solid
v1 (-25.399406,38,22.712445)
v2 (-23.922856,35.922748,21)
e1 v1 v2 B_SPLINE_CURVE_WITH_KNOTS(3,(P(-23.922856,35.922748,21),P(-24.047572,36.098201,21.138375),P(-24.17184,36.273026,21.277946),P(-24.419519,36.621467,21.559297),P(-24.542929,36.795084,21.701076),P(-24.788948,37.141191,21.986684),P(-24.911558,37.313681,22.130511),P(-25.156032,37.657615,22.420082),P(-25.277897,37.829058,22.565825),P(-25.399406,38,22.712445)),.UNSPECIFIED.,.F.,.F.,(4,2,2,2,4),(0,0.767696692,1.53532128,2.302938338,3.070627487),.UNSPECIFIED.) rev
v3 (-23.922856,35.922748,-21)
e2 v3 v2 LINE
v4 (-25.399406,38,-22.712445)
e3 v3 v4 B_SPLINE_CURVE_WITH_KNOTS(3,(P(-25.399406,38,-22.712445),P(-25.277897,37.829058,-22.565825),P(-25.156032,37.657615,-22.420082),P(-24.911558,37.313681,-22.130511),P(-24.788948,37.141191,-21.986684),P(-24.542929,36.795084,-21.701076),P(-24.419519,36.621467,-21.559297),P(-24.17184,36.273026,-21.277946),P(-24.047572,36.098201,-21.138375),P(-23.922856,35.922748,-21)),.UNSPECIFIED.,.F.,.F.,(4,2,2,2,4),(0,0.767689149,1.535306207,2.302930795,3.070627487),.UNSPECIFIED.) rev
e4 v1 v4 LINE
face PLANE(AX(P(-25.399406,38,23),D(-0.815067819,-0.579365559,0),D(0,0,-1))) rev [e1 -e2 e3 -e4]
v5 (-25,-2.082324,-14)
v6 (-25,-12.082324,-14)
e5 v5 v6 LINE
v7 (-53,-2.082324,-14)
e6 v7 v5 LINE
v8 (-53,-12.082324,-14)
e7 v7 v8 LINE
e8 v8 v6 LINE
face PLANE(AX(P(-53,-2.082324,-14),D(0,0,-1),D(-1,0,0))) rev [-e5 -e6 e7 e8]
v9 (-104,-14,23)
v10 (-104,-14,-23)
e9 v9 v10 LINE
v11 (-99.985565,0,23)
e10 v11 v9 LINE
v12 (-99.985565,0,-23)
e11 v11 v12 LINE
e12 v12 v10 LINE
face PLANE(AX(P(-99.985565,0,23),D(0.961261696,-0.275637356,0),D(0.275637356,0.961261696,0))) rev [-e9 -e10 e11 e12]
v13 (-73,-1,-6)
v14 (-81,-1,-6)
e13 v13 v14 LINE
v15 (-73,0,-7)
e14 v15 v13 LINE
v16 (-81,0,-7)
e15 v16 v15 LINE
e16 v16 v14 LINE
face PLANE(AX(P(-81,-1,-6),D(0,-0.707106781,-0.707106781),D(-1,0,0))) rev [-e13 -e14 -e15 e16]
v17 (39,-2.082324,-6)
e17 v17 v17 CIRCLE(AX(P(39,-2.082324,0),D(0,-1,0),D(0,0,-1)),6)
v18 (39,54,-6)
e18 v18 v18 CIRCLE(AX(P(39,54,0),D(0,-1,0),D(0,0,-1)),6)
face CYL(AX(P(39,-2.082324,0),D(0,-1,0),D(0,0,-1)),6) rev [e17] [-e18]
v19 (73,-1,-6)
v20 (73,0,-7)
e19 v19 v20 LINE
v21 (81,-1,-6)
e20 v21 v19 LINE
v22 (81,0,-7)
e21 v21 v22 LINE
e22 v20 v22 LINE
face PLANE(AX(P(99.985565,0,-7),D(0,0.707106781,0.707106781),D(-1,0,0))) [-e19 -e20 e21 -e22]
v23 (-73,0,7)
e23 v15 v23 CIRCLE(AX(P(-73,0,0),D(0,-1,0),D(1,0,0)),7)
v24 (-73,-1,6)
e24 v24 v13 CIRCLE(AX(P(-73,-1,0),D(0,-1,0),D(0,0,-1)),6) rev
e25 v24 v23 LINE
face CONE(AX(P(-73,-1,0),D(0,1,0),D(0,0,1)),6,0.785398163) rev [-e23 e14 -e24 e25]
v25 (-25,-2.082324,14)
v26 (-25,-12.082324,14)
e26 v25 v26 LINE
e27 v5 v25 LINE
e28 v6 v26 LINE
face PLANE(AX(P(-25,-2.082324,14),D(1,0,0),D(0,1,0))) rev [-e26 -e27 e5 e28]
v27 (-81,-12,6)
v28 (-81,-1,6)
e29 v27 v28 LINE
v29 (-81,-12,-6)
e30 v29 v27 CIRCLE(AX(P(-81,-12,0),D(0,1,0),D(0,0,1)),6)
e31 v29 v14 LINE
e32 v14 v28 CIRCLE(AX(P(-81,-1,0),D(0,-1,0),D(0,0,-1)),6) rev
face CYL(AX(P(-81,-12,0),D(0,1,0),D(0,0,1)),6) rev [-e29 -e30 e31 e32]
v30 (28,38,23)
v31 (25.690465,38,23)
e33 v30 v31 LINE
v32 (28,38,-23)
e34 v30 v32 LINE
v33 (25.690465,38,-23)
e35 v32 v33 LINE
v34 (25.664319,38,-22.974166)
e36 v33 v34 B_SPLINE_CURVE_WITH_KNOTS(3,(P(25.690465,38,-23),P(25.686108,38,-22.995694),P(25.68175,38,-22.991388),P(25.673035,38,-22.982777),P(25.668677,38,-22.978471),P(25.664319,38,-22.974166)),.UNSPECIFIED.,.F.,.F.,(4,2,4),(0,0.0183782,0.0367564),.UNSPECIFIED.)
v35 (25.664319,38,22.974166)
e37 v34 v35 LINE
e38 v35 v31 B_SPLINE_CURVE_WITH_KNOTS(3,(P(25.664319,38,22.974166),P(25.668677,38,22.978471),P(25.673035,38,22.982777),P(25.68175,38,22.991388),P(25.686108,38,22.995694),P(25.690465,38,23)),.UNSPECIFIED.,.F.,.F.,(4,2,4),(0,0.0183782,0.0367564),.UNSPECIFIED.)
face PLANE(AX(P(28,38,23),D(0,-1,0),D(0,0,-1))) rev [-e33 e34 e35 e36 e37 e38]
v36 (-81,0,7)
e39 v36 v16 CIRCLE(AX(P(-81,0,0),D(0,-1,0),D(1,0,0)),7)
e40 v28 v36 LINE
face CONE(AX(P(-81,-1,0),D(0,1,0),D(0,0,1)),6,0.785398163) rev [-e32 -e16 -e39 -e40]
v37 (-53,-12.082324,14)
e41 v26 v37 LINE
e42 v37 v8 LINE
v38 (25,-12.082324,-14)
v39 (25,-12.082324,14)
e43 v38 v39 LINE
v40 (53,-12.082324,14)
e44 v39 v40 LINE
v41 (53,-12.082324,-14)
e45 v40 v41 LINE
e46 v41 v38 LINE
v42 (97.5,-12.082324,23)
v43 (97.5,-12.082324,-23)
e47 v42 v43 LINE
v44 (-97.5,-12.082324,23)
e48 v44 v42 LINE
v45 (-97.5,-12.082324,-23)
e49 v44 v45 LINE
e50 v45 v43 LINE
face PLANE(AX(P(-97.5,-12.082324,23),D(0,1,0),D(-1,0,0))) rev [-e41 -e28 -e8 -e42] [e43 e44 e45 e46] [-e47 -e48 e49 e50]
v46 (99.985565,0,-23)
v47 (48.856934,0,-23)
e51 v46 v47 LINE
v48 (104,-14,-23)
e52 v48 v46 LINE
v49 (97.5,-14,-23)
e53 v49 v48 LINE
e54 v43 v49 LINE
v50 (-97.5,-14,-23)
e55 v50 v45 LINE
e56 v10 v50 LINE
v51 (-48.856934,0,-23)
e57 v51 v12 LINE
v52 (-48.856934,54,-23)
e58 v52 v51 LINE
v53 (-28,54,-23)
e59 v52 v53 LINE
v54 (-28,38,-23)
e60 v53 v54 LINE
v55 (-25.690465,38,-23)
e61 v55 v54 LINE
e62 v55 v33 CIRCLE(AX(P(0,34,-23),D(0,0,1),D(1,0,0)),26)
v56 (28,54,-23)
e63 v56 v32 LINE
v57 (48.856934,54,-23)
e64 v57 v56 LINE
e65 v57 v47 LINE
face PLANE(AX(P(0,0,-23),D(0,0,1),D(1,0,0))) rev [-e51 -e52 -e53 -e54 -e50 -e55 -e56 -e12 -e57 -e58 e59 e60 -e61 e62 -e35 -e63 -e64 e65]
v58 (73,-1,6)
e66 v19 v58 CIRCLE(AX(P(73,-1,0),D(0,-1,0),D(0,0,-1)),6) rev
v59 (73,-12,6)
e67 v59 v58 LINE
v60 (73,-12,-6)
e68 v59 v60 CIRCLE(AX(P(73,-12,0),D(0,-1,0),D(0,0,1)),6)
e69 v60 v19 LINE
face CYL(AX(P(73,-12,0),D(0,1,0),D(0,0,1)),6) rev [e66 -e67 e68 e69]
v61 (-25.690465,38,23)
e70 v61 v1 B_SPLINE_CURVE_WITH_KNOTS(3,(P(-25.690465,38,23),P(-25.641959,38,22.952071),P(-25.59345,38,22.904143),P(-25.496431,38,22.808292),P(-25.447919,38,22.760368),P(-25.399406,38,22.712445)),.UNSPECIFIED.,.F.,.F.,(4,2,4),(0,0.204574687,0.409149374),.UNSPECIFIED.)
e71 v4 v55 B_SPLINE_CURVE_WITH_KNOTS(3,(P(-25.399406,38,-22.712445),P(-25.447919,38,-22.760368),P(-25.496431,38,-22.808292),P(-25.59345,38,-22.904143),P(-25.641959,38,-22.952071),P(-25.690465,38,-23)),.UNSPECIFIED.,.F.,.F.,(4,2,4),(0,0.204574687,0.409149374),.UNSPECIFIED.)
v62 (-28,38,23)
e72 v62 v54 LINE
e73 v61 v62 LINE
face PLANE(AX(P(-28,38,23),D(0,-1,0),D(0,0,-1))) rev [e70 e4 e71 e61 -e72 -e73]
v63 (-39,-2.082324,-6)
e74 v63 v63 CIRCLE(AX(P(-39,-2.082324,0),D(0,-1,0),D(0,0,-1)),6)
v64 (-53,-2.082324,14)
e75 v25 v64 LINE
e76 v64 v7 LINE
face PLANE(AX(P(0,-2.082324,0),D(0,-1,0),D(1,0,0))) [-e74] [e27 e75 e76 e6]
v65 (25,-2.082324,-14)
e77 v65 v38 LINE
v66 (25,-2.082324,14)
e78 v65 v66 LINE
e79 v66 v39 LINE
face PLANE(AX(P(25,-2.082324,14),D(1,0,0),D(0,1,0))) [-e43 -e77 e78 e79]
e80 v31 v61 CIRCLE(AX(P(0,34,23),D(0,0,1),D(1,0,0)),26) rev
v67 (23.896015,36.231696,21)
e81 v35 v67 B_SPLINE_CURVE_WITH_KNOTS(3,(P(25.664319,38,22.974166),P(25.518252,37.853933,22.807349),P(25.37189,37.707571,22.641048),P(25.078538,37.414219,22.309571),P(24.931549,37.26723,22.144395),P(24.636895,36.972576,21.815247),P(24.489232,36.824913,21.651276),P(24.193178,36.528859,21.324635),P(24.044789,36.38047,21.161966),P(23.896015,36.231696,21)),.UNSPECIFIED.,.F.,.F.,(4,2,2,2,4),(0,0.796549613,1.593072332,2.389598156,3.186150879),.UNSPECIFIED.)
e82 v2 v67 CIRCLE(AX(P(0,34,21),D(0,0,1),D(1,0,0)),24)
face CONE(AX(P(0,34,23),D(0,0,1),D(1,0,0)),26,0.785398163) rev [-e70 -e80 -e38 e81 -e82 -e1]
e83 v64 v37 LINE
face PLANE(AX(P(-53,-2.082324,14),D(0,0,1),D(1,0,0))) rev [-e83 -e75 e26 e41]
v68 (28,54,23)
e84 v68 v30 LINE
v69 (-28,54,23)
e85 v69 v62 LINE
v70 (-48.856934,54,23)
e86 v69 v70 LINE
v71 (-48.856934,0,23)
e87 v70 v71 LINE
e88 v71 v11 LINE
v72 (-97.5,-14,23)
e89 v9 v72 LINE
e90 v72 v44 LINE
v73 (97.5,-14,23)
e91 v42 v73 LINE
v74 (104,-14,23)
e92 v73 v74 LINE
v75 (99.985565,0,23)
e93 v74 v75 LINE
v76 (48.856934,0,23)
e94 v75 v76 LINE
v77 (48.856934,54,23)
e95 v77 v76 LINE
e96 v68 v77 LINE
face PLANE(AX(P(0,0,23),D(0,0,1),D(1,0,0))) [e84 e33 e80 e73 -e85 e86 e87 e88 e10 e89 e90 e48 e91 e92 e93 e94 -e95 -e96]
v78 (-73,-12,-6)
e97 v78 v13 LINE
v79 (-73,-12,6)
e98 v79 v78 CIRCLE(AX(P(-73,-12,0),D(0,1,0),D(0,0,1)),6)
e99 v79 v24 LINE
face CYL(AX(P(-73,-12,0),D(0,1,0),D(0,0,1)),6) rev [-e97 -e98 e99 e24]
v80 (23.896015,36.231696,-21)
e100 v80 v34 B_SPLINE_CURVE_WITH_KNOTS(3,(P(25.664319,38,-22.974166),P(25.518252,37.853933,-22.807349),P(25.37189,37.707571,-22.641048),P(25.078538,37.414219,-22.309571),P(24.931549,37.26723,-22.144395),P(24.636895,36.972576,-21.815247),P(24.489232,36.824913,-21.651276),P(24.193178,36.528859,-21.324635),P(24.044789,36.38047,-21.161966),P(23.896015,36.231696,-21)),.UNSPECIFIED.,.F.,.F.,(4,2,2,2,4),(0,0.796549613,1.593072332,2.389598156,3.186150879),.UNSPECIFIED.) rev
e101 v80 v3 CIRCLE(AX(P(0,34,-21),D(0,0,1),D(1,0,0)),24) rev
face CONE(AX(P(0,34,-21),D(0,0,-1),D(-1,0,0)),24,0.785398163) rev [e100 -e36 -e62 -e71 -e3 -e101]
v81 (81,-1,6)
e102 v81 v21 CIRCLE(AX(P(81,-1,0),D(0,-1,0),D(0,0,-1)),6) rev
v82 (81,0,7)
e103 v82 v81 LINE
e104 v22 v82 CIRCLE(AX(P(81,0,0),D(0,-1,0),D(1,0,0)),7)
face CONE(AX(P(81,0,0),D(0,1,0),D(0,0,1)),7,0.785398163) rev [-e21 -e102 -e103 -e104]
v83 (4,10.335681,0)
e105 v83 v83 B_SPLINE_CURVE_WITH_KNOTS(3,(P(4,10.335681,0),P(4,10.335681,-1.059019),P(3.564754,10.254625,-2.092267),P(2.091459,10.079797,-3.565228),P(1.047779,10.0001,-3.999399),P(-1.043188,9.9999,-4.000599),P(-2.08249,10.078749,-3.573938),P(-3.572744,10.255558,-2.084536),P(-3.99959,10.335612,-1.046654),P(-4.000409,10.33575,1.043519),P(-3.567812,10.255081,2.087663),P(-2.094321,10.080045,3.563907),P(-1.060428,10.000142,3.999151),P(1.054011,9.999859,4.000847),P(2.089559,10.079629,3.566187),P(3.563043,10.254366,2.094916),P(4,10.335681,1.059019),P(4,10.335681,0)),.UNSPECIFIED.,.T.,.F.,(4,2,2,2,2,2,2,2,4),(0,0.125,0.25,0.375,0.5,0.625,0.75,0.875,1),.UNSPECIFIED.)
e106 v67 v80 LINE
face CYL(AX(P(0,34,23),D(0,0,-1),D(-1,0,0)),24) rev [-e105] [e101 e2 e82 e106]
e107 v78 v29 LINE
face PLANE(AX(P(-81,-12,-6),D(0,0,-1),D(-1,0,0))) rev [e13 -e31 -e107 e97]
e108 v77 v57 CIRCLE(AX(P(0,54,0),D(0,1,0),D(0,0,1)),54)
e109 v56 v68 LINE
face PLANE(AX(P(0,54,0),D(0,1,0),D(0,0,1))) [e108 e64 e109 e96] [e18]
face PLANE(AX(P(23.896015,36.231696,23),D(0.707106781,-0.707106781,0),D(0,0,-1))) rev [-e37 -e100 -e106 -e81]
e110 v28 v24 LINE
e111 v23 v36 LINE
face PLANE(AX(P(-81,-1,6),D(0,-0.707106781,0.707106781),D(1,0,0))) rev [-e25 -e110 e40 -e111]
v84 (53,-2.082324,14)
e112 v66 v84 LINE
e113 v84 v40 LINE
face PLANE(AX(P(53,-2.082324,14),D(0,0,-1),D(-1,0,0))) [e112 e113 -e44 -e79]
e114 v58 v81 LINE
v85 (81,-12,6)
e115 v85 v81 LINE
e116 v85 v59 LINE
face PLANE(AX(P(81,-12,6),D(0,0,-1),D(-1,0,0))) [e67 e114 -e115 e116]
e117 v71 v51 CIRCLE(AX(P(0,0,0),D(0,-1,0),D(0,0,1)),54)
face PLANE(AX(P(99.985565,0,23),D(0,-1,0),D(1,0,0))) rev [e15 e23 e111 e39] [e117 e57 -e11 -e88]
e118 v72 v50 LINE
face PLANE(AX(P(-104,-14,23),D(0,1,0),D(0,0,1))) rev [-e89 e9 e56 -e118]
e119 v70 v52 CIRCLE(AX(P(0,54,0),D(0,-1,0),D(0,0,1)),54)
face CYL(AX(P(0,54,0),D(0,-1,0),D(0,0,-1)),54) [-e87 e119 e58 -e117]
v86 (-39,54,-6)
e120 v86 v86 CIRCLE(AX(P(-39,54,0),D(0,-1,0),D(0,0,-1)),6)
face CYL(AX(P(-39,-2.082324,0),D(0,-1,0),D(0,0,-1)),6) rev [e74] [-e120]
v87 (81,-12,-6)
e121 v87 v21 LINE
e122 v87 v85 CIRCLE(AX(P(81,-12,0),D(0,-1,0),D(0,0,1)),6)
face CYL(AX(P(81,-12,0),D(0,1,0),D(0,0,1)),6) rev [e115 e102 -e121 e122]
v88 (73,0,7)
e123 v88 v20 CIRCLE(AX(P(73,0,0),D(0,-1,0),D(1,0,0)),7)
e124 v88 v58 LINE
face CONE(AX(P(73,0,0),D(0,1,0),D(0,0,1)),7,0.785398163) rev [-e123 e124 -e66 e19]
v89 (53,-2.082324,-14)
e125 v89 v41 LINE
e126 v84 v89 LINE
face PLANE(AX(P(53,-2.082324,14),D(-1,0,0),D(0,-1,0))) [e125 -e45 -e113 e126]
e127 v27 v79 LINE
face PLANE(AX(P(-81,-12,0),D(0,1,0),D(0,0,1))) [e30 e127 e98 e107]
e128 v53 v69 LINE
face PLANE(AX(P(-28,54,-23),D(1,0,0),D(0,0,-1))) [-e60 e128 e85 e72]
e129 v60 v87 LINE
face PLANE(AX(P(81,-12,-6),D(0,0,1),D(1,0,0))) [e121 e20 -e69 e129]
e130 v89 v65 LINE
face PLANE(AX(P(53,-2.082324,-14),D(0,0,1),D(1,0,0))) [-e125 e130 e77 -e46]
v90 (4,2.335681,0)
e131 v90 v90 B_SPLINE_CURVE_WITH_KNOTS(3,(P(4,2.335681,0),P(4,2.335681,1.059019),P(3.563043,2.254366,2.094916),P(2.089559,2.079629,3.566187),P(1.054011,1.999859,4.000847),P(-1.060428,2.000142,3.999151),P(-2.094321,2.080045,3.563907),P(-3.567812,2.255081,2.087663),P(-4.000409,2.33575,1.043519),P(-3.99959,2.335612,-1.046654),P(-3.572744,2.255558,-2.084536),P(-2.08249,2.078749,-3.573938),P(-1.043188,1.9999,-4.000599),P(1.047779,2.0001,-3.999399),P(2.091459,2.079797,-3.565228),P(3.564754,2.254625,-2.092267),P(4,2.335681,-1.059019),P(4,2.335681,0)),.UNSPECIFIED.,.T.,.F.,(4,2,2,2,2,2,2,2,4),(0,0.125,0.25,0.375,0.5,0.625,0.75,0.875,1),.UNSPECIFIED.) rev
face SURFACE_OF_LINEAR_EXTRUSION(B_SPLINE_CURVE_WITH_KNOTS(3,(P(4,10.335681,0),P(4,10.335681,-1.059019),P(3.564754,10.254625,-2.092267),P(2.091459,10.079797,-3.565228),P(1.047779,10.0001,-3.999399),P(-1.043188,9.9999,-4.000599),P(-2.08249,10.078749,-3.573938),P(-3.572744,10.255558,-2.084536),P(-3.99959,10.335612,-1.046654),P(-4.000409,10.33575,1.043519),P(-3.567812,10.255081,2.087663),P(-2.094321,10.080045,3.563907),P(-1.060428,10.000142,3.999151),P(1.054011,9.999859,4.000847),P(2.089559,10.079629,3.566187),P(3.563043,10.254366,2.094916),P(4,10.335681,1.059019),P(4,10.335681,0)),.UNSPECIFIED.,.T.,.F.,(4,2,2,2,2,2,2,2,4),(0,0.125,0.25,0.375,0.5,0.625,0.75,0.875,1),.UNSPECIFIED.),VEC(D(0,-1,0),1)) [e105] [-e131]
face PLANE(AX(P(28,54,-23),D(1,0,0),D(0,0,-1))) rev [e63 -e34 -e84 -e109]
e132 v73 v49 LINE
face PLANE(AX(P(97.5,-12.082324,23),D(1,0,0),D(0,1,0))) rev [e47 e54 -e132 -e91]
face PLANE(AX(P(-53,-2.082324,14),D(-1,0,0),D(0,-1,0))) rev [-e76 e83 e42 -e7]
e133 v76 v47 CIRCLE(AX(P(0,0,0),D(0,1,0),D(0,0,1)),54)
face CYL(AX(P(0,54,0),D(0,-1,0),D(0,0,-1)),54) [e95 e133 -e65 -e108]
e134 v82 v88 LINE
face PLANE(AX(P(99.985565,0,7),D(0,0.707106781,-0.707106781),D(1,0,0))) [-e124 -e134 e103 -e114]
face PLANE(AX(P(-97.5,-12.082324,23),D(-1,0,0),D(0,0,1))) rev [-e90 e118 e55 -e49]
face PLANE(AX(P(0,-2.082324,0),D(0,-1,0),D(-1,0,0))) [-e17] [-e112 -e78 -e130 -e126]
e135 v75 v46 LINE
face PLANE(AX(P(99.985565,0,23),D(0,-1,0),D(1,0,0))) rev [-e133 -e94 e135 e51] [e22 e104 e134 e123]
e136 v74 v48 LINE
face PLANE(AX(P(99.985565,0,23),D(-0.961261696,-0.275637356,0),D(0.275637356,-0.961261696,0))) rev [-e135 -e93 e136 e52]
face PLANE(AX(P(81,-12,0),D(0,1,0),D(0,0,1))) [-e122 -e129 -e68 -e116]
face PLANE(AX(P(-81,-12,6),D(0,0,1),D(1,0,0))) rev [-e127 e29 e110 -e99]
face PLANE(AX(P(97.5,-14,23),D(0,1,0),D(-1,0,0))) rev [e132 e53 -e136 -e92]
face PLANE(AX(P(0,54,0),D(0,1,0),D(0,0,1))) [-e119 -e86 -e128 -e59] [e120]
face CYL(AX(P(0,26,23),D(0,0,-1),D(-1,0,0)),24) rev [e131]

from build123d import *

# Parameters (mm, degrees)
BOSS_EXTRUDE1_DEPTH      = 23
BOSS_EXTRUDE2_DEPTH      = 54
BOSS_EXTRUDE3_DEPTH      = 23
CUT_EXTRUDE1_DEPTH       = 12
CHAMFER1_SIZE            = 1
CHAMFER1_OF_MIRROR2_SIZE = 1
SKETCH7_W                = 28
SKETCH7_H                = 28
CUT_EXTRUDE2_DEPTH       = 10
F_12_0MM_DOWEL_HOLE1_D   = 12
CUT_EXTRUDE3_START       = 1.999999915
CUT_EXTRUDE3_DEPTH       = 36.000000085
CUT_EXTRUDE3_START_2     = -5
CUT_EXTRUDE3_2_DEPTH     = 10
CHAMFER2_START           = -23
CHAMFER2_2_DEPTH         = 46


with BuildPart() as part:
    # Sketch2 → Boss-Extrude1 (new, symmetric)
    with BuildSketch(Plane.XY):
        Polygon((99.985564599, 0), (-99.985564599, 0), (-104, -14), (-97.5, -14), (-97.5, -12.082323829), (97.5, -12.082323829), (97.5, -14), (104, -14), align=None)
    extrude(amount=BOSS_EXTRUDE1_DEPTH, both=True)

    # Sketch3 → Boss-Extrude2 (add)
    with BuildSketch(Plane(origin=(0, 0, 0), x_dir=(1, 0, 0), z_dir=(0, 1, 0))):
        with BuildLine():
            Line((48.856934001, -23), (28, -23))
            Line((28, -23), (28, 23))
            Line((28, 23), (48.856934001, 23))
            ThreePointArc((48.856934001, 23), (54, 0), (48.856934001, -23))
        make_face()
    boss_extrude2 = extrude(amount=BOSS_EXTRUDE2_DEPTH)

    # Mirror1: Boss-Extrude2 across plane
    add(boss_extrude2.mirror(Plane(origin=(0, 0, 0), x_dir=(0, 0, 1), z_dir=(1, 0, 0))))

    # Sketch4 → Boss-Extrude3 (add, symmetric)
    with BuildSketch(Plane.XY):
        with BuildLine():
            Line((-28, 38), (-23.664319132, 38))
            ThreePointArc((-23.664319132, 38), (0, 10), (23.664319132, 38))
            Line((23.664319132, 38), (28, 38))
            Line((28, 38), (28, 0))
            Line((28, 0), (-28, 0))
            Line((-28, 0), (-28, 38))
        make_face()
    extrude(amount=BOSS_EXTRUDE3_DEPTH, both=True)

    # Sketch5 → Cut-Extrude1 (cut)
    with BuildSketch(Plane(origin=(0, 0, 0), x_dir=(1, 0, 0), z_dir=(0, 1, 0))):
        with BuildLine():
            Line((-81, 6), (-73, 6))
            ThreePointArc((-73, 6), (-67, 0), (-73, -6))
            Line((-73, -6), (-81, -6))
            ThreePointArc((-81, -6), (-87, 0), (-81, 6))
        make_face()
    cut_extrude1 = extrude(amount=-CUT_EXTRUDE1_DEPTH, mode=Mode.SUBTRACT)

    # Chamfer1
    chamfer1_edges = [part.edges().sort_by_distance(p)[0] for p in [
        (-87, 0, 0),
        (-77, 0, 6),
        (-67, 0, 0),
        (-77, 0, -6),
    ]]
    chamfer(chamfer1_edges, length=CHAMFER1_SIZE)

    # Mirror2: Cut-Extrude1 across plane
    add(cut_extrude1.mirror(Plane(origin=(0, 0, 0), x_dir=(0, 0, 1), z_dir=(1, 0, 0))), mode=Mode.SUBTRACT)

    # Chamfer1 of Mirror2
    chamfer1_of_mirror2_edges = [part.edges().sort_by_distance(p)[0] for p in [
        (87, 0, 0),
        (77, 0, 6),
        (67, 0, 0),
        (77, 0, -6),
    ]]
    chamfer(chamfer1_of_mirror2_edges, length=CHAMFER1_OF_MIRROR2_SIZE)

    # Sketch7 → Cut-Extrude2 (cut)
    with BuildSketch(Plane.XZ.offset(12.082323829)):
        with Locations((-39, 0)):
            Rectangle(SKETCH7_W, SKETCH7_H)
    cut_extrude2 = extrude(amount=-CUT_EXTRUDE2_DEPTH, mode=Mode.SUBTRACT)

    # Mirror3: Cut-Extrude2 across plane
    add(cut_extrude2.mirror(Plane(origin=(0, 0, 0), x_dir=(0, 0, 1), z_dir=(1, 0, 0))), mode=Mode.SUBTRACT)

    # Ø12.0mm Dowel Hole1 (through all)
    with Locations(Plane(origin=(0, -2.082323829, 0), x_dir=(-1, 0, 0), z_dir=(0, -1, 0))):
        with Locations((39, 0), (-39, 0)):
            Hole(F_12_0MM_DOWEL_HOLE1_D / 2)

    # Cut-Extrude3: read off the stored shape, not the designer's step
    # Cut-Extrude3 outline → Cut-Extrude3 (cut)
    with BuildSketch(Plane(origin=(0, 0, 0), x_dir=(1, 0, 0), z_dir=(0, 1, 0)).offset(CUT_EXTRUDE3_START)):
        with BuildLine():
            add(Edge.make_bspline(
                [(4, 0), (4, 1.059018663), (3.564754015, 2.092267125), (2.091459192, 3.565228094), (1.047779124, 3.999399314), (-1.043187737, 4.000599369), (-2.08248981, 3.57393755), (-3.572744195, 2.08453648), (-3.999590121, 1.046654427), (-4.000409264, -1.043519212), (-3.567812098, -2.087662609), (-2.094321457, -3.563907402), (-1.060428453, -3.999150693), (1.054011474, -4.000846733), (2.089559005, -3.5661873), (3.563043078, -2.094915922), (4, -1.059018663), (4, 0)],
                knots=[0, 0, 0, 0, 0.125, 0.125, 0.25, 0.25, 0.375, 0.375, 0.5, 0.5, 0.625, 0.625, 0.75, 0.75, 0.875, 0.875, 1, 1, 1, 1], degree=3))
        make_face()
    extrude(amount=CUT_EXTRUDE3_DEPTH, mode=Mode.SUBTRACT)

    # Cut-Extrude3 2 outline → Cut-Extrude3 2 (add)
    with BuildSketch(Plane.XY.offset(CUT_EXTRUDE3_START_2)):
        with BuildLine():
            Line((5, 2.504711719), (4, 2.335680868))
            ThreePointArc((4, 2.335680868), (2.007030354, 2.084067462), (2.16e-07, 2))
            Line((2.16e-07, 2), (5, 1.999999915))
            Line((5, 1.999999915), (5, 2.504711719))
        make_face()
        with BuildLine():
            Line((-5, 1.999999915), (2.16e-07, 2))
            ThreePointArc((2.16e-07, 2), (-2.014229388, 2.084672698), (-4.014246469, 2.338093372))
            Line((-4.014246469, 2.338093372), (-5, 2.505326626))
            Line((-5, 2.505326626), (-5, 1.999999915))
        make_face()
    extrude(amount=CUT_EXTRUDE3_2_DEPTH)

    # Chamfer2: read off the stored shape, not the designer's step
    # Chamfer2 outline → Chamfer2 (revolve, cut)
    with BuildSketch(Plane.XZ.offset(-34)):
        Polygon((24, 23), (24, 21), (26, 23), align=None)
        Polygon((26, -23), (24, -21), (24, -23), align=None)
    revolve(axis=Axis((0, 34, 0), (0, 0, 1)), mode=Mode.SUBTRACT)

    # Chamfer2 2 outline → Chamfer2 2 (cut)
    with BuildSketch(Plane.XY.offset(CHAMFER2_START)):
        with BuildLine():
            ThreePointArc((23.664319132, 38), (23.796597884, 37.118000823), (23.896015012, 36.231695881))
            Line((23.896015012, 36.231695881), (25.664319132, 38))
            Line((25.664319132, 38), (23.664319132, 38))
        make_face()
        with BuildLine():
            Line((-25.399406115, 38), (-23.922856044, 35.922747689))
            ThreePointArc((-23.922856044, 35.922747689), (-23.816245603, 36.964193884), (-23.664319132, 38))
            Line((-23.664319132, 38), (-25.399406115, 38))
        make_face()
    extrude(amount=CHAMFER2_2_DEPTH, mode=Mode.SUBTRACT)


solid = part.part
